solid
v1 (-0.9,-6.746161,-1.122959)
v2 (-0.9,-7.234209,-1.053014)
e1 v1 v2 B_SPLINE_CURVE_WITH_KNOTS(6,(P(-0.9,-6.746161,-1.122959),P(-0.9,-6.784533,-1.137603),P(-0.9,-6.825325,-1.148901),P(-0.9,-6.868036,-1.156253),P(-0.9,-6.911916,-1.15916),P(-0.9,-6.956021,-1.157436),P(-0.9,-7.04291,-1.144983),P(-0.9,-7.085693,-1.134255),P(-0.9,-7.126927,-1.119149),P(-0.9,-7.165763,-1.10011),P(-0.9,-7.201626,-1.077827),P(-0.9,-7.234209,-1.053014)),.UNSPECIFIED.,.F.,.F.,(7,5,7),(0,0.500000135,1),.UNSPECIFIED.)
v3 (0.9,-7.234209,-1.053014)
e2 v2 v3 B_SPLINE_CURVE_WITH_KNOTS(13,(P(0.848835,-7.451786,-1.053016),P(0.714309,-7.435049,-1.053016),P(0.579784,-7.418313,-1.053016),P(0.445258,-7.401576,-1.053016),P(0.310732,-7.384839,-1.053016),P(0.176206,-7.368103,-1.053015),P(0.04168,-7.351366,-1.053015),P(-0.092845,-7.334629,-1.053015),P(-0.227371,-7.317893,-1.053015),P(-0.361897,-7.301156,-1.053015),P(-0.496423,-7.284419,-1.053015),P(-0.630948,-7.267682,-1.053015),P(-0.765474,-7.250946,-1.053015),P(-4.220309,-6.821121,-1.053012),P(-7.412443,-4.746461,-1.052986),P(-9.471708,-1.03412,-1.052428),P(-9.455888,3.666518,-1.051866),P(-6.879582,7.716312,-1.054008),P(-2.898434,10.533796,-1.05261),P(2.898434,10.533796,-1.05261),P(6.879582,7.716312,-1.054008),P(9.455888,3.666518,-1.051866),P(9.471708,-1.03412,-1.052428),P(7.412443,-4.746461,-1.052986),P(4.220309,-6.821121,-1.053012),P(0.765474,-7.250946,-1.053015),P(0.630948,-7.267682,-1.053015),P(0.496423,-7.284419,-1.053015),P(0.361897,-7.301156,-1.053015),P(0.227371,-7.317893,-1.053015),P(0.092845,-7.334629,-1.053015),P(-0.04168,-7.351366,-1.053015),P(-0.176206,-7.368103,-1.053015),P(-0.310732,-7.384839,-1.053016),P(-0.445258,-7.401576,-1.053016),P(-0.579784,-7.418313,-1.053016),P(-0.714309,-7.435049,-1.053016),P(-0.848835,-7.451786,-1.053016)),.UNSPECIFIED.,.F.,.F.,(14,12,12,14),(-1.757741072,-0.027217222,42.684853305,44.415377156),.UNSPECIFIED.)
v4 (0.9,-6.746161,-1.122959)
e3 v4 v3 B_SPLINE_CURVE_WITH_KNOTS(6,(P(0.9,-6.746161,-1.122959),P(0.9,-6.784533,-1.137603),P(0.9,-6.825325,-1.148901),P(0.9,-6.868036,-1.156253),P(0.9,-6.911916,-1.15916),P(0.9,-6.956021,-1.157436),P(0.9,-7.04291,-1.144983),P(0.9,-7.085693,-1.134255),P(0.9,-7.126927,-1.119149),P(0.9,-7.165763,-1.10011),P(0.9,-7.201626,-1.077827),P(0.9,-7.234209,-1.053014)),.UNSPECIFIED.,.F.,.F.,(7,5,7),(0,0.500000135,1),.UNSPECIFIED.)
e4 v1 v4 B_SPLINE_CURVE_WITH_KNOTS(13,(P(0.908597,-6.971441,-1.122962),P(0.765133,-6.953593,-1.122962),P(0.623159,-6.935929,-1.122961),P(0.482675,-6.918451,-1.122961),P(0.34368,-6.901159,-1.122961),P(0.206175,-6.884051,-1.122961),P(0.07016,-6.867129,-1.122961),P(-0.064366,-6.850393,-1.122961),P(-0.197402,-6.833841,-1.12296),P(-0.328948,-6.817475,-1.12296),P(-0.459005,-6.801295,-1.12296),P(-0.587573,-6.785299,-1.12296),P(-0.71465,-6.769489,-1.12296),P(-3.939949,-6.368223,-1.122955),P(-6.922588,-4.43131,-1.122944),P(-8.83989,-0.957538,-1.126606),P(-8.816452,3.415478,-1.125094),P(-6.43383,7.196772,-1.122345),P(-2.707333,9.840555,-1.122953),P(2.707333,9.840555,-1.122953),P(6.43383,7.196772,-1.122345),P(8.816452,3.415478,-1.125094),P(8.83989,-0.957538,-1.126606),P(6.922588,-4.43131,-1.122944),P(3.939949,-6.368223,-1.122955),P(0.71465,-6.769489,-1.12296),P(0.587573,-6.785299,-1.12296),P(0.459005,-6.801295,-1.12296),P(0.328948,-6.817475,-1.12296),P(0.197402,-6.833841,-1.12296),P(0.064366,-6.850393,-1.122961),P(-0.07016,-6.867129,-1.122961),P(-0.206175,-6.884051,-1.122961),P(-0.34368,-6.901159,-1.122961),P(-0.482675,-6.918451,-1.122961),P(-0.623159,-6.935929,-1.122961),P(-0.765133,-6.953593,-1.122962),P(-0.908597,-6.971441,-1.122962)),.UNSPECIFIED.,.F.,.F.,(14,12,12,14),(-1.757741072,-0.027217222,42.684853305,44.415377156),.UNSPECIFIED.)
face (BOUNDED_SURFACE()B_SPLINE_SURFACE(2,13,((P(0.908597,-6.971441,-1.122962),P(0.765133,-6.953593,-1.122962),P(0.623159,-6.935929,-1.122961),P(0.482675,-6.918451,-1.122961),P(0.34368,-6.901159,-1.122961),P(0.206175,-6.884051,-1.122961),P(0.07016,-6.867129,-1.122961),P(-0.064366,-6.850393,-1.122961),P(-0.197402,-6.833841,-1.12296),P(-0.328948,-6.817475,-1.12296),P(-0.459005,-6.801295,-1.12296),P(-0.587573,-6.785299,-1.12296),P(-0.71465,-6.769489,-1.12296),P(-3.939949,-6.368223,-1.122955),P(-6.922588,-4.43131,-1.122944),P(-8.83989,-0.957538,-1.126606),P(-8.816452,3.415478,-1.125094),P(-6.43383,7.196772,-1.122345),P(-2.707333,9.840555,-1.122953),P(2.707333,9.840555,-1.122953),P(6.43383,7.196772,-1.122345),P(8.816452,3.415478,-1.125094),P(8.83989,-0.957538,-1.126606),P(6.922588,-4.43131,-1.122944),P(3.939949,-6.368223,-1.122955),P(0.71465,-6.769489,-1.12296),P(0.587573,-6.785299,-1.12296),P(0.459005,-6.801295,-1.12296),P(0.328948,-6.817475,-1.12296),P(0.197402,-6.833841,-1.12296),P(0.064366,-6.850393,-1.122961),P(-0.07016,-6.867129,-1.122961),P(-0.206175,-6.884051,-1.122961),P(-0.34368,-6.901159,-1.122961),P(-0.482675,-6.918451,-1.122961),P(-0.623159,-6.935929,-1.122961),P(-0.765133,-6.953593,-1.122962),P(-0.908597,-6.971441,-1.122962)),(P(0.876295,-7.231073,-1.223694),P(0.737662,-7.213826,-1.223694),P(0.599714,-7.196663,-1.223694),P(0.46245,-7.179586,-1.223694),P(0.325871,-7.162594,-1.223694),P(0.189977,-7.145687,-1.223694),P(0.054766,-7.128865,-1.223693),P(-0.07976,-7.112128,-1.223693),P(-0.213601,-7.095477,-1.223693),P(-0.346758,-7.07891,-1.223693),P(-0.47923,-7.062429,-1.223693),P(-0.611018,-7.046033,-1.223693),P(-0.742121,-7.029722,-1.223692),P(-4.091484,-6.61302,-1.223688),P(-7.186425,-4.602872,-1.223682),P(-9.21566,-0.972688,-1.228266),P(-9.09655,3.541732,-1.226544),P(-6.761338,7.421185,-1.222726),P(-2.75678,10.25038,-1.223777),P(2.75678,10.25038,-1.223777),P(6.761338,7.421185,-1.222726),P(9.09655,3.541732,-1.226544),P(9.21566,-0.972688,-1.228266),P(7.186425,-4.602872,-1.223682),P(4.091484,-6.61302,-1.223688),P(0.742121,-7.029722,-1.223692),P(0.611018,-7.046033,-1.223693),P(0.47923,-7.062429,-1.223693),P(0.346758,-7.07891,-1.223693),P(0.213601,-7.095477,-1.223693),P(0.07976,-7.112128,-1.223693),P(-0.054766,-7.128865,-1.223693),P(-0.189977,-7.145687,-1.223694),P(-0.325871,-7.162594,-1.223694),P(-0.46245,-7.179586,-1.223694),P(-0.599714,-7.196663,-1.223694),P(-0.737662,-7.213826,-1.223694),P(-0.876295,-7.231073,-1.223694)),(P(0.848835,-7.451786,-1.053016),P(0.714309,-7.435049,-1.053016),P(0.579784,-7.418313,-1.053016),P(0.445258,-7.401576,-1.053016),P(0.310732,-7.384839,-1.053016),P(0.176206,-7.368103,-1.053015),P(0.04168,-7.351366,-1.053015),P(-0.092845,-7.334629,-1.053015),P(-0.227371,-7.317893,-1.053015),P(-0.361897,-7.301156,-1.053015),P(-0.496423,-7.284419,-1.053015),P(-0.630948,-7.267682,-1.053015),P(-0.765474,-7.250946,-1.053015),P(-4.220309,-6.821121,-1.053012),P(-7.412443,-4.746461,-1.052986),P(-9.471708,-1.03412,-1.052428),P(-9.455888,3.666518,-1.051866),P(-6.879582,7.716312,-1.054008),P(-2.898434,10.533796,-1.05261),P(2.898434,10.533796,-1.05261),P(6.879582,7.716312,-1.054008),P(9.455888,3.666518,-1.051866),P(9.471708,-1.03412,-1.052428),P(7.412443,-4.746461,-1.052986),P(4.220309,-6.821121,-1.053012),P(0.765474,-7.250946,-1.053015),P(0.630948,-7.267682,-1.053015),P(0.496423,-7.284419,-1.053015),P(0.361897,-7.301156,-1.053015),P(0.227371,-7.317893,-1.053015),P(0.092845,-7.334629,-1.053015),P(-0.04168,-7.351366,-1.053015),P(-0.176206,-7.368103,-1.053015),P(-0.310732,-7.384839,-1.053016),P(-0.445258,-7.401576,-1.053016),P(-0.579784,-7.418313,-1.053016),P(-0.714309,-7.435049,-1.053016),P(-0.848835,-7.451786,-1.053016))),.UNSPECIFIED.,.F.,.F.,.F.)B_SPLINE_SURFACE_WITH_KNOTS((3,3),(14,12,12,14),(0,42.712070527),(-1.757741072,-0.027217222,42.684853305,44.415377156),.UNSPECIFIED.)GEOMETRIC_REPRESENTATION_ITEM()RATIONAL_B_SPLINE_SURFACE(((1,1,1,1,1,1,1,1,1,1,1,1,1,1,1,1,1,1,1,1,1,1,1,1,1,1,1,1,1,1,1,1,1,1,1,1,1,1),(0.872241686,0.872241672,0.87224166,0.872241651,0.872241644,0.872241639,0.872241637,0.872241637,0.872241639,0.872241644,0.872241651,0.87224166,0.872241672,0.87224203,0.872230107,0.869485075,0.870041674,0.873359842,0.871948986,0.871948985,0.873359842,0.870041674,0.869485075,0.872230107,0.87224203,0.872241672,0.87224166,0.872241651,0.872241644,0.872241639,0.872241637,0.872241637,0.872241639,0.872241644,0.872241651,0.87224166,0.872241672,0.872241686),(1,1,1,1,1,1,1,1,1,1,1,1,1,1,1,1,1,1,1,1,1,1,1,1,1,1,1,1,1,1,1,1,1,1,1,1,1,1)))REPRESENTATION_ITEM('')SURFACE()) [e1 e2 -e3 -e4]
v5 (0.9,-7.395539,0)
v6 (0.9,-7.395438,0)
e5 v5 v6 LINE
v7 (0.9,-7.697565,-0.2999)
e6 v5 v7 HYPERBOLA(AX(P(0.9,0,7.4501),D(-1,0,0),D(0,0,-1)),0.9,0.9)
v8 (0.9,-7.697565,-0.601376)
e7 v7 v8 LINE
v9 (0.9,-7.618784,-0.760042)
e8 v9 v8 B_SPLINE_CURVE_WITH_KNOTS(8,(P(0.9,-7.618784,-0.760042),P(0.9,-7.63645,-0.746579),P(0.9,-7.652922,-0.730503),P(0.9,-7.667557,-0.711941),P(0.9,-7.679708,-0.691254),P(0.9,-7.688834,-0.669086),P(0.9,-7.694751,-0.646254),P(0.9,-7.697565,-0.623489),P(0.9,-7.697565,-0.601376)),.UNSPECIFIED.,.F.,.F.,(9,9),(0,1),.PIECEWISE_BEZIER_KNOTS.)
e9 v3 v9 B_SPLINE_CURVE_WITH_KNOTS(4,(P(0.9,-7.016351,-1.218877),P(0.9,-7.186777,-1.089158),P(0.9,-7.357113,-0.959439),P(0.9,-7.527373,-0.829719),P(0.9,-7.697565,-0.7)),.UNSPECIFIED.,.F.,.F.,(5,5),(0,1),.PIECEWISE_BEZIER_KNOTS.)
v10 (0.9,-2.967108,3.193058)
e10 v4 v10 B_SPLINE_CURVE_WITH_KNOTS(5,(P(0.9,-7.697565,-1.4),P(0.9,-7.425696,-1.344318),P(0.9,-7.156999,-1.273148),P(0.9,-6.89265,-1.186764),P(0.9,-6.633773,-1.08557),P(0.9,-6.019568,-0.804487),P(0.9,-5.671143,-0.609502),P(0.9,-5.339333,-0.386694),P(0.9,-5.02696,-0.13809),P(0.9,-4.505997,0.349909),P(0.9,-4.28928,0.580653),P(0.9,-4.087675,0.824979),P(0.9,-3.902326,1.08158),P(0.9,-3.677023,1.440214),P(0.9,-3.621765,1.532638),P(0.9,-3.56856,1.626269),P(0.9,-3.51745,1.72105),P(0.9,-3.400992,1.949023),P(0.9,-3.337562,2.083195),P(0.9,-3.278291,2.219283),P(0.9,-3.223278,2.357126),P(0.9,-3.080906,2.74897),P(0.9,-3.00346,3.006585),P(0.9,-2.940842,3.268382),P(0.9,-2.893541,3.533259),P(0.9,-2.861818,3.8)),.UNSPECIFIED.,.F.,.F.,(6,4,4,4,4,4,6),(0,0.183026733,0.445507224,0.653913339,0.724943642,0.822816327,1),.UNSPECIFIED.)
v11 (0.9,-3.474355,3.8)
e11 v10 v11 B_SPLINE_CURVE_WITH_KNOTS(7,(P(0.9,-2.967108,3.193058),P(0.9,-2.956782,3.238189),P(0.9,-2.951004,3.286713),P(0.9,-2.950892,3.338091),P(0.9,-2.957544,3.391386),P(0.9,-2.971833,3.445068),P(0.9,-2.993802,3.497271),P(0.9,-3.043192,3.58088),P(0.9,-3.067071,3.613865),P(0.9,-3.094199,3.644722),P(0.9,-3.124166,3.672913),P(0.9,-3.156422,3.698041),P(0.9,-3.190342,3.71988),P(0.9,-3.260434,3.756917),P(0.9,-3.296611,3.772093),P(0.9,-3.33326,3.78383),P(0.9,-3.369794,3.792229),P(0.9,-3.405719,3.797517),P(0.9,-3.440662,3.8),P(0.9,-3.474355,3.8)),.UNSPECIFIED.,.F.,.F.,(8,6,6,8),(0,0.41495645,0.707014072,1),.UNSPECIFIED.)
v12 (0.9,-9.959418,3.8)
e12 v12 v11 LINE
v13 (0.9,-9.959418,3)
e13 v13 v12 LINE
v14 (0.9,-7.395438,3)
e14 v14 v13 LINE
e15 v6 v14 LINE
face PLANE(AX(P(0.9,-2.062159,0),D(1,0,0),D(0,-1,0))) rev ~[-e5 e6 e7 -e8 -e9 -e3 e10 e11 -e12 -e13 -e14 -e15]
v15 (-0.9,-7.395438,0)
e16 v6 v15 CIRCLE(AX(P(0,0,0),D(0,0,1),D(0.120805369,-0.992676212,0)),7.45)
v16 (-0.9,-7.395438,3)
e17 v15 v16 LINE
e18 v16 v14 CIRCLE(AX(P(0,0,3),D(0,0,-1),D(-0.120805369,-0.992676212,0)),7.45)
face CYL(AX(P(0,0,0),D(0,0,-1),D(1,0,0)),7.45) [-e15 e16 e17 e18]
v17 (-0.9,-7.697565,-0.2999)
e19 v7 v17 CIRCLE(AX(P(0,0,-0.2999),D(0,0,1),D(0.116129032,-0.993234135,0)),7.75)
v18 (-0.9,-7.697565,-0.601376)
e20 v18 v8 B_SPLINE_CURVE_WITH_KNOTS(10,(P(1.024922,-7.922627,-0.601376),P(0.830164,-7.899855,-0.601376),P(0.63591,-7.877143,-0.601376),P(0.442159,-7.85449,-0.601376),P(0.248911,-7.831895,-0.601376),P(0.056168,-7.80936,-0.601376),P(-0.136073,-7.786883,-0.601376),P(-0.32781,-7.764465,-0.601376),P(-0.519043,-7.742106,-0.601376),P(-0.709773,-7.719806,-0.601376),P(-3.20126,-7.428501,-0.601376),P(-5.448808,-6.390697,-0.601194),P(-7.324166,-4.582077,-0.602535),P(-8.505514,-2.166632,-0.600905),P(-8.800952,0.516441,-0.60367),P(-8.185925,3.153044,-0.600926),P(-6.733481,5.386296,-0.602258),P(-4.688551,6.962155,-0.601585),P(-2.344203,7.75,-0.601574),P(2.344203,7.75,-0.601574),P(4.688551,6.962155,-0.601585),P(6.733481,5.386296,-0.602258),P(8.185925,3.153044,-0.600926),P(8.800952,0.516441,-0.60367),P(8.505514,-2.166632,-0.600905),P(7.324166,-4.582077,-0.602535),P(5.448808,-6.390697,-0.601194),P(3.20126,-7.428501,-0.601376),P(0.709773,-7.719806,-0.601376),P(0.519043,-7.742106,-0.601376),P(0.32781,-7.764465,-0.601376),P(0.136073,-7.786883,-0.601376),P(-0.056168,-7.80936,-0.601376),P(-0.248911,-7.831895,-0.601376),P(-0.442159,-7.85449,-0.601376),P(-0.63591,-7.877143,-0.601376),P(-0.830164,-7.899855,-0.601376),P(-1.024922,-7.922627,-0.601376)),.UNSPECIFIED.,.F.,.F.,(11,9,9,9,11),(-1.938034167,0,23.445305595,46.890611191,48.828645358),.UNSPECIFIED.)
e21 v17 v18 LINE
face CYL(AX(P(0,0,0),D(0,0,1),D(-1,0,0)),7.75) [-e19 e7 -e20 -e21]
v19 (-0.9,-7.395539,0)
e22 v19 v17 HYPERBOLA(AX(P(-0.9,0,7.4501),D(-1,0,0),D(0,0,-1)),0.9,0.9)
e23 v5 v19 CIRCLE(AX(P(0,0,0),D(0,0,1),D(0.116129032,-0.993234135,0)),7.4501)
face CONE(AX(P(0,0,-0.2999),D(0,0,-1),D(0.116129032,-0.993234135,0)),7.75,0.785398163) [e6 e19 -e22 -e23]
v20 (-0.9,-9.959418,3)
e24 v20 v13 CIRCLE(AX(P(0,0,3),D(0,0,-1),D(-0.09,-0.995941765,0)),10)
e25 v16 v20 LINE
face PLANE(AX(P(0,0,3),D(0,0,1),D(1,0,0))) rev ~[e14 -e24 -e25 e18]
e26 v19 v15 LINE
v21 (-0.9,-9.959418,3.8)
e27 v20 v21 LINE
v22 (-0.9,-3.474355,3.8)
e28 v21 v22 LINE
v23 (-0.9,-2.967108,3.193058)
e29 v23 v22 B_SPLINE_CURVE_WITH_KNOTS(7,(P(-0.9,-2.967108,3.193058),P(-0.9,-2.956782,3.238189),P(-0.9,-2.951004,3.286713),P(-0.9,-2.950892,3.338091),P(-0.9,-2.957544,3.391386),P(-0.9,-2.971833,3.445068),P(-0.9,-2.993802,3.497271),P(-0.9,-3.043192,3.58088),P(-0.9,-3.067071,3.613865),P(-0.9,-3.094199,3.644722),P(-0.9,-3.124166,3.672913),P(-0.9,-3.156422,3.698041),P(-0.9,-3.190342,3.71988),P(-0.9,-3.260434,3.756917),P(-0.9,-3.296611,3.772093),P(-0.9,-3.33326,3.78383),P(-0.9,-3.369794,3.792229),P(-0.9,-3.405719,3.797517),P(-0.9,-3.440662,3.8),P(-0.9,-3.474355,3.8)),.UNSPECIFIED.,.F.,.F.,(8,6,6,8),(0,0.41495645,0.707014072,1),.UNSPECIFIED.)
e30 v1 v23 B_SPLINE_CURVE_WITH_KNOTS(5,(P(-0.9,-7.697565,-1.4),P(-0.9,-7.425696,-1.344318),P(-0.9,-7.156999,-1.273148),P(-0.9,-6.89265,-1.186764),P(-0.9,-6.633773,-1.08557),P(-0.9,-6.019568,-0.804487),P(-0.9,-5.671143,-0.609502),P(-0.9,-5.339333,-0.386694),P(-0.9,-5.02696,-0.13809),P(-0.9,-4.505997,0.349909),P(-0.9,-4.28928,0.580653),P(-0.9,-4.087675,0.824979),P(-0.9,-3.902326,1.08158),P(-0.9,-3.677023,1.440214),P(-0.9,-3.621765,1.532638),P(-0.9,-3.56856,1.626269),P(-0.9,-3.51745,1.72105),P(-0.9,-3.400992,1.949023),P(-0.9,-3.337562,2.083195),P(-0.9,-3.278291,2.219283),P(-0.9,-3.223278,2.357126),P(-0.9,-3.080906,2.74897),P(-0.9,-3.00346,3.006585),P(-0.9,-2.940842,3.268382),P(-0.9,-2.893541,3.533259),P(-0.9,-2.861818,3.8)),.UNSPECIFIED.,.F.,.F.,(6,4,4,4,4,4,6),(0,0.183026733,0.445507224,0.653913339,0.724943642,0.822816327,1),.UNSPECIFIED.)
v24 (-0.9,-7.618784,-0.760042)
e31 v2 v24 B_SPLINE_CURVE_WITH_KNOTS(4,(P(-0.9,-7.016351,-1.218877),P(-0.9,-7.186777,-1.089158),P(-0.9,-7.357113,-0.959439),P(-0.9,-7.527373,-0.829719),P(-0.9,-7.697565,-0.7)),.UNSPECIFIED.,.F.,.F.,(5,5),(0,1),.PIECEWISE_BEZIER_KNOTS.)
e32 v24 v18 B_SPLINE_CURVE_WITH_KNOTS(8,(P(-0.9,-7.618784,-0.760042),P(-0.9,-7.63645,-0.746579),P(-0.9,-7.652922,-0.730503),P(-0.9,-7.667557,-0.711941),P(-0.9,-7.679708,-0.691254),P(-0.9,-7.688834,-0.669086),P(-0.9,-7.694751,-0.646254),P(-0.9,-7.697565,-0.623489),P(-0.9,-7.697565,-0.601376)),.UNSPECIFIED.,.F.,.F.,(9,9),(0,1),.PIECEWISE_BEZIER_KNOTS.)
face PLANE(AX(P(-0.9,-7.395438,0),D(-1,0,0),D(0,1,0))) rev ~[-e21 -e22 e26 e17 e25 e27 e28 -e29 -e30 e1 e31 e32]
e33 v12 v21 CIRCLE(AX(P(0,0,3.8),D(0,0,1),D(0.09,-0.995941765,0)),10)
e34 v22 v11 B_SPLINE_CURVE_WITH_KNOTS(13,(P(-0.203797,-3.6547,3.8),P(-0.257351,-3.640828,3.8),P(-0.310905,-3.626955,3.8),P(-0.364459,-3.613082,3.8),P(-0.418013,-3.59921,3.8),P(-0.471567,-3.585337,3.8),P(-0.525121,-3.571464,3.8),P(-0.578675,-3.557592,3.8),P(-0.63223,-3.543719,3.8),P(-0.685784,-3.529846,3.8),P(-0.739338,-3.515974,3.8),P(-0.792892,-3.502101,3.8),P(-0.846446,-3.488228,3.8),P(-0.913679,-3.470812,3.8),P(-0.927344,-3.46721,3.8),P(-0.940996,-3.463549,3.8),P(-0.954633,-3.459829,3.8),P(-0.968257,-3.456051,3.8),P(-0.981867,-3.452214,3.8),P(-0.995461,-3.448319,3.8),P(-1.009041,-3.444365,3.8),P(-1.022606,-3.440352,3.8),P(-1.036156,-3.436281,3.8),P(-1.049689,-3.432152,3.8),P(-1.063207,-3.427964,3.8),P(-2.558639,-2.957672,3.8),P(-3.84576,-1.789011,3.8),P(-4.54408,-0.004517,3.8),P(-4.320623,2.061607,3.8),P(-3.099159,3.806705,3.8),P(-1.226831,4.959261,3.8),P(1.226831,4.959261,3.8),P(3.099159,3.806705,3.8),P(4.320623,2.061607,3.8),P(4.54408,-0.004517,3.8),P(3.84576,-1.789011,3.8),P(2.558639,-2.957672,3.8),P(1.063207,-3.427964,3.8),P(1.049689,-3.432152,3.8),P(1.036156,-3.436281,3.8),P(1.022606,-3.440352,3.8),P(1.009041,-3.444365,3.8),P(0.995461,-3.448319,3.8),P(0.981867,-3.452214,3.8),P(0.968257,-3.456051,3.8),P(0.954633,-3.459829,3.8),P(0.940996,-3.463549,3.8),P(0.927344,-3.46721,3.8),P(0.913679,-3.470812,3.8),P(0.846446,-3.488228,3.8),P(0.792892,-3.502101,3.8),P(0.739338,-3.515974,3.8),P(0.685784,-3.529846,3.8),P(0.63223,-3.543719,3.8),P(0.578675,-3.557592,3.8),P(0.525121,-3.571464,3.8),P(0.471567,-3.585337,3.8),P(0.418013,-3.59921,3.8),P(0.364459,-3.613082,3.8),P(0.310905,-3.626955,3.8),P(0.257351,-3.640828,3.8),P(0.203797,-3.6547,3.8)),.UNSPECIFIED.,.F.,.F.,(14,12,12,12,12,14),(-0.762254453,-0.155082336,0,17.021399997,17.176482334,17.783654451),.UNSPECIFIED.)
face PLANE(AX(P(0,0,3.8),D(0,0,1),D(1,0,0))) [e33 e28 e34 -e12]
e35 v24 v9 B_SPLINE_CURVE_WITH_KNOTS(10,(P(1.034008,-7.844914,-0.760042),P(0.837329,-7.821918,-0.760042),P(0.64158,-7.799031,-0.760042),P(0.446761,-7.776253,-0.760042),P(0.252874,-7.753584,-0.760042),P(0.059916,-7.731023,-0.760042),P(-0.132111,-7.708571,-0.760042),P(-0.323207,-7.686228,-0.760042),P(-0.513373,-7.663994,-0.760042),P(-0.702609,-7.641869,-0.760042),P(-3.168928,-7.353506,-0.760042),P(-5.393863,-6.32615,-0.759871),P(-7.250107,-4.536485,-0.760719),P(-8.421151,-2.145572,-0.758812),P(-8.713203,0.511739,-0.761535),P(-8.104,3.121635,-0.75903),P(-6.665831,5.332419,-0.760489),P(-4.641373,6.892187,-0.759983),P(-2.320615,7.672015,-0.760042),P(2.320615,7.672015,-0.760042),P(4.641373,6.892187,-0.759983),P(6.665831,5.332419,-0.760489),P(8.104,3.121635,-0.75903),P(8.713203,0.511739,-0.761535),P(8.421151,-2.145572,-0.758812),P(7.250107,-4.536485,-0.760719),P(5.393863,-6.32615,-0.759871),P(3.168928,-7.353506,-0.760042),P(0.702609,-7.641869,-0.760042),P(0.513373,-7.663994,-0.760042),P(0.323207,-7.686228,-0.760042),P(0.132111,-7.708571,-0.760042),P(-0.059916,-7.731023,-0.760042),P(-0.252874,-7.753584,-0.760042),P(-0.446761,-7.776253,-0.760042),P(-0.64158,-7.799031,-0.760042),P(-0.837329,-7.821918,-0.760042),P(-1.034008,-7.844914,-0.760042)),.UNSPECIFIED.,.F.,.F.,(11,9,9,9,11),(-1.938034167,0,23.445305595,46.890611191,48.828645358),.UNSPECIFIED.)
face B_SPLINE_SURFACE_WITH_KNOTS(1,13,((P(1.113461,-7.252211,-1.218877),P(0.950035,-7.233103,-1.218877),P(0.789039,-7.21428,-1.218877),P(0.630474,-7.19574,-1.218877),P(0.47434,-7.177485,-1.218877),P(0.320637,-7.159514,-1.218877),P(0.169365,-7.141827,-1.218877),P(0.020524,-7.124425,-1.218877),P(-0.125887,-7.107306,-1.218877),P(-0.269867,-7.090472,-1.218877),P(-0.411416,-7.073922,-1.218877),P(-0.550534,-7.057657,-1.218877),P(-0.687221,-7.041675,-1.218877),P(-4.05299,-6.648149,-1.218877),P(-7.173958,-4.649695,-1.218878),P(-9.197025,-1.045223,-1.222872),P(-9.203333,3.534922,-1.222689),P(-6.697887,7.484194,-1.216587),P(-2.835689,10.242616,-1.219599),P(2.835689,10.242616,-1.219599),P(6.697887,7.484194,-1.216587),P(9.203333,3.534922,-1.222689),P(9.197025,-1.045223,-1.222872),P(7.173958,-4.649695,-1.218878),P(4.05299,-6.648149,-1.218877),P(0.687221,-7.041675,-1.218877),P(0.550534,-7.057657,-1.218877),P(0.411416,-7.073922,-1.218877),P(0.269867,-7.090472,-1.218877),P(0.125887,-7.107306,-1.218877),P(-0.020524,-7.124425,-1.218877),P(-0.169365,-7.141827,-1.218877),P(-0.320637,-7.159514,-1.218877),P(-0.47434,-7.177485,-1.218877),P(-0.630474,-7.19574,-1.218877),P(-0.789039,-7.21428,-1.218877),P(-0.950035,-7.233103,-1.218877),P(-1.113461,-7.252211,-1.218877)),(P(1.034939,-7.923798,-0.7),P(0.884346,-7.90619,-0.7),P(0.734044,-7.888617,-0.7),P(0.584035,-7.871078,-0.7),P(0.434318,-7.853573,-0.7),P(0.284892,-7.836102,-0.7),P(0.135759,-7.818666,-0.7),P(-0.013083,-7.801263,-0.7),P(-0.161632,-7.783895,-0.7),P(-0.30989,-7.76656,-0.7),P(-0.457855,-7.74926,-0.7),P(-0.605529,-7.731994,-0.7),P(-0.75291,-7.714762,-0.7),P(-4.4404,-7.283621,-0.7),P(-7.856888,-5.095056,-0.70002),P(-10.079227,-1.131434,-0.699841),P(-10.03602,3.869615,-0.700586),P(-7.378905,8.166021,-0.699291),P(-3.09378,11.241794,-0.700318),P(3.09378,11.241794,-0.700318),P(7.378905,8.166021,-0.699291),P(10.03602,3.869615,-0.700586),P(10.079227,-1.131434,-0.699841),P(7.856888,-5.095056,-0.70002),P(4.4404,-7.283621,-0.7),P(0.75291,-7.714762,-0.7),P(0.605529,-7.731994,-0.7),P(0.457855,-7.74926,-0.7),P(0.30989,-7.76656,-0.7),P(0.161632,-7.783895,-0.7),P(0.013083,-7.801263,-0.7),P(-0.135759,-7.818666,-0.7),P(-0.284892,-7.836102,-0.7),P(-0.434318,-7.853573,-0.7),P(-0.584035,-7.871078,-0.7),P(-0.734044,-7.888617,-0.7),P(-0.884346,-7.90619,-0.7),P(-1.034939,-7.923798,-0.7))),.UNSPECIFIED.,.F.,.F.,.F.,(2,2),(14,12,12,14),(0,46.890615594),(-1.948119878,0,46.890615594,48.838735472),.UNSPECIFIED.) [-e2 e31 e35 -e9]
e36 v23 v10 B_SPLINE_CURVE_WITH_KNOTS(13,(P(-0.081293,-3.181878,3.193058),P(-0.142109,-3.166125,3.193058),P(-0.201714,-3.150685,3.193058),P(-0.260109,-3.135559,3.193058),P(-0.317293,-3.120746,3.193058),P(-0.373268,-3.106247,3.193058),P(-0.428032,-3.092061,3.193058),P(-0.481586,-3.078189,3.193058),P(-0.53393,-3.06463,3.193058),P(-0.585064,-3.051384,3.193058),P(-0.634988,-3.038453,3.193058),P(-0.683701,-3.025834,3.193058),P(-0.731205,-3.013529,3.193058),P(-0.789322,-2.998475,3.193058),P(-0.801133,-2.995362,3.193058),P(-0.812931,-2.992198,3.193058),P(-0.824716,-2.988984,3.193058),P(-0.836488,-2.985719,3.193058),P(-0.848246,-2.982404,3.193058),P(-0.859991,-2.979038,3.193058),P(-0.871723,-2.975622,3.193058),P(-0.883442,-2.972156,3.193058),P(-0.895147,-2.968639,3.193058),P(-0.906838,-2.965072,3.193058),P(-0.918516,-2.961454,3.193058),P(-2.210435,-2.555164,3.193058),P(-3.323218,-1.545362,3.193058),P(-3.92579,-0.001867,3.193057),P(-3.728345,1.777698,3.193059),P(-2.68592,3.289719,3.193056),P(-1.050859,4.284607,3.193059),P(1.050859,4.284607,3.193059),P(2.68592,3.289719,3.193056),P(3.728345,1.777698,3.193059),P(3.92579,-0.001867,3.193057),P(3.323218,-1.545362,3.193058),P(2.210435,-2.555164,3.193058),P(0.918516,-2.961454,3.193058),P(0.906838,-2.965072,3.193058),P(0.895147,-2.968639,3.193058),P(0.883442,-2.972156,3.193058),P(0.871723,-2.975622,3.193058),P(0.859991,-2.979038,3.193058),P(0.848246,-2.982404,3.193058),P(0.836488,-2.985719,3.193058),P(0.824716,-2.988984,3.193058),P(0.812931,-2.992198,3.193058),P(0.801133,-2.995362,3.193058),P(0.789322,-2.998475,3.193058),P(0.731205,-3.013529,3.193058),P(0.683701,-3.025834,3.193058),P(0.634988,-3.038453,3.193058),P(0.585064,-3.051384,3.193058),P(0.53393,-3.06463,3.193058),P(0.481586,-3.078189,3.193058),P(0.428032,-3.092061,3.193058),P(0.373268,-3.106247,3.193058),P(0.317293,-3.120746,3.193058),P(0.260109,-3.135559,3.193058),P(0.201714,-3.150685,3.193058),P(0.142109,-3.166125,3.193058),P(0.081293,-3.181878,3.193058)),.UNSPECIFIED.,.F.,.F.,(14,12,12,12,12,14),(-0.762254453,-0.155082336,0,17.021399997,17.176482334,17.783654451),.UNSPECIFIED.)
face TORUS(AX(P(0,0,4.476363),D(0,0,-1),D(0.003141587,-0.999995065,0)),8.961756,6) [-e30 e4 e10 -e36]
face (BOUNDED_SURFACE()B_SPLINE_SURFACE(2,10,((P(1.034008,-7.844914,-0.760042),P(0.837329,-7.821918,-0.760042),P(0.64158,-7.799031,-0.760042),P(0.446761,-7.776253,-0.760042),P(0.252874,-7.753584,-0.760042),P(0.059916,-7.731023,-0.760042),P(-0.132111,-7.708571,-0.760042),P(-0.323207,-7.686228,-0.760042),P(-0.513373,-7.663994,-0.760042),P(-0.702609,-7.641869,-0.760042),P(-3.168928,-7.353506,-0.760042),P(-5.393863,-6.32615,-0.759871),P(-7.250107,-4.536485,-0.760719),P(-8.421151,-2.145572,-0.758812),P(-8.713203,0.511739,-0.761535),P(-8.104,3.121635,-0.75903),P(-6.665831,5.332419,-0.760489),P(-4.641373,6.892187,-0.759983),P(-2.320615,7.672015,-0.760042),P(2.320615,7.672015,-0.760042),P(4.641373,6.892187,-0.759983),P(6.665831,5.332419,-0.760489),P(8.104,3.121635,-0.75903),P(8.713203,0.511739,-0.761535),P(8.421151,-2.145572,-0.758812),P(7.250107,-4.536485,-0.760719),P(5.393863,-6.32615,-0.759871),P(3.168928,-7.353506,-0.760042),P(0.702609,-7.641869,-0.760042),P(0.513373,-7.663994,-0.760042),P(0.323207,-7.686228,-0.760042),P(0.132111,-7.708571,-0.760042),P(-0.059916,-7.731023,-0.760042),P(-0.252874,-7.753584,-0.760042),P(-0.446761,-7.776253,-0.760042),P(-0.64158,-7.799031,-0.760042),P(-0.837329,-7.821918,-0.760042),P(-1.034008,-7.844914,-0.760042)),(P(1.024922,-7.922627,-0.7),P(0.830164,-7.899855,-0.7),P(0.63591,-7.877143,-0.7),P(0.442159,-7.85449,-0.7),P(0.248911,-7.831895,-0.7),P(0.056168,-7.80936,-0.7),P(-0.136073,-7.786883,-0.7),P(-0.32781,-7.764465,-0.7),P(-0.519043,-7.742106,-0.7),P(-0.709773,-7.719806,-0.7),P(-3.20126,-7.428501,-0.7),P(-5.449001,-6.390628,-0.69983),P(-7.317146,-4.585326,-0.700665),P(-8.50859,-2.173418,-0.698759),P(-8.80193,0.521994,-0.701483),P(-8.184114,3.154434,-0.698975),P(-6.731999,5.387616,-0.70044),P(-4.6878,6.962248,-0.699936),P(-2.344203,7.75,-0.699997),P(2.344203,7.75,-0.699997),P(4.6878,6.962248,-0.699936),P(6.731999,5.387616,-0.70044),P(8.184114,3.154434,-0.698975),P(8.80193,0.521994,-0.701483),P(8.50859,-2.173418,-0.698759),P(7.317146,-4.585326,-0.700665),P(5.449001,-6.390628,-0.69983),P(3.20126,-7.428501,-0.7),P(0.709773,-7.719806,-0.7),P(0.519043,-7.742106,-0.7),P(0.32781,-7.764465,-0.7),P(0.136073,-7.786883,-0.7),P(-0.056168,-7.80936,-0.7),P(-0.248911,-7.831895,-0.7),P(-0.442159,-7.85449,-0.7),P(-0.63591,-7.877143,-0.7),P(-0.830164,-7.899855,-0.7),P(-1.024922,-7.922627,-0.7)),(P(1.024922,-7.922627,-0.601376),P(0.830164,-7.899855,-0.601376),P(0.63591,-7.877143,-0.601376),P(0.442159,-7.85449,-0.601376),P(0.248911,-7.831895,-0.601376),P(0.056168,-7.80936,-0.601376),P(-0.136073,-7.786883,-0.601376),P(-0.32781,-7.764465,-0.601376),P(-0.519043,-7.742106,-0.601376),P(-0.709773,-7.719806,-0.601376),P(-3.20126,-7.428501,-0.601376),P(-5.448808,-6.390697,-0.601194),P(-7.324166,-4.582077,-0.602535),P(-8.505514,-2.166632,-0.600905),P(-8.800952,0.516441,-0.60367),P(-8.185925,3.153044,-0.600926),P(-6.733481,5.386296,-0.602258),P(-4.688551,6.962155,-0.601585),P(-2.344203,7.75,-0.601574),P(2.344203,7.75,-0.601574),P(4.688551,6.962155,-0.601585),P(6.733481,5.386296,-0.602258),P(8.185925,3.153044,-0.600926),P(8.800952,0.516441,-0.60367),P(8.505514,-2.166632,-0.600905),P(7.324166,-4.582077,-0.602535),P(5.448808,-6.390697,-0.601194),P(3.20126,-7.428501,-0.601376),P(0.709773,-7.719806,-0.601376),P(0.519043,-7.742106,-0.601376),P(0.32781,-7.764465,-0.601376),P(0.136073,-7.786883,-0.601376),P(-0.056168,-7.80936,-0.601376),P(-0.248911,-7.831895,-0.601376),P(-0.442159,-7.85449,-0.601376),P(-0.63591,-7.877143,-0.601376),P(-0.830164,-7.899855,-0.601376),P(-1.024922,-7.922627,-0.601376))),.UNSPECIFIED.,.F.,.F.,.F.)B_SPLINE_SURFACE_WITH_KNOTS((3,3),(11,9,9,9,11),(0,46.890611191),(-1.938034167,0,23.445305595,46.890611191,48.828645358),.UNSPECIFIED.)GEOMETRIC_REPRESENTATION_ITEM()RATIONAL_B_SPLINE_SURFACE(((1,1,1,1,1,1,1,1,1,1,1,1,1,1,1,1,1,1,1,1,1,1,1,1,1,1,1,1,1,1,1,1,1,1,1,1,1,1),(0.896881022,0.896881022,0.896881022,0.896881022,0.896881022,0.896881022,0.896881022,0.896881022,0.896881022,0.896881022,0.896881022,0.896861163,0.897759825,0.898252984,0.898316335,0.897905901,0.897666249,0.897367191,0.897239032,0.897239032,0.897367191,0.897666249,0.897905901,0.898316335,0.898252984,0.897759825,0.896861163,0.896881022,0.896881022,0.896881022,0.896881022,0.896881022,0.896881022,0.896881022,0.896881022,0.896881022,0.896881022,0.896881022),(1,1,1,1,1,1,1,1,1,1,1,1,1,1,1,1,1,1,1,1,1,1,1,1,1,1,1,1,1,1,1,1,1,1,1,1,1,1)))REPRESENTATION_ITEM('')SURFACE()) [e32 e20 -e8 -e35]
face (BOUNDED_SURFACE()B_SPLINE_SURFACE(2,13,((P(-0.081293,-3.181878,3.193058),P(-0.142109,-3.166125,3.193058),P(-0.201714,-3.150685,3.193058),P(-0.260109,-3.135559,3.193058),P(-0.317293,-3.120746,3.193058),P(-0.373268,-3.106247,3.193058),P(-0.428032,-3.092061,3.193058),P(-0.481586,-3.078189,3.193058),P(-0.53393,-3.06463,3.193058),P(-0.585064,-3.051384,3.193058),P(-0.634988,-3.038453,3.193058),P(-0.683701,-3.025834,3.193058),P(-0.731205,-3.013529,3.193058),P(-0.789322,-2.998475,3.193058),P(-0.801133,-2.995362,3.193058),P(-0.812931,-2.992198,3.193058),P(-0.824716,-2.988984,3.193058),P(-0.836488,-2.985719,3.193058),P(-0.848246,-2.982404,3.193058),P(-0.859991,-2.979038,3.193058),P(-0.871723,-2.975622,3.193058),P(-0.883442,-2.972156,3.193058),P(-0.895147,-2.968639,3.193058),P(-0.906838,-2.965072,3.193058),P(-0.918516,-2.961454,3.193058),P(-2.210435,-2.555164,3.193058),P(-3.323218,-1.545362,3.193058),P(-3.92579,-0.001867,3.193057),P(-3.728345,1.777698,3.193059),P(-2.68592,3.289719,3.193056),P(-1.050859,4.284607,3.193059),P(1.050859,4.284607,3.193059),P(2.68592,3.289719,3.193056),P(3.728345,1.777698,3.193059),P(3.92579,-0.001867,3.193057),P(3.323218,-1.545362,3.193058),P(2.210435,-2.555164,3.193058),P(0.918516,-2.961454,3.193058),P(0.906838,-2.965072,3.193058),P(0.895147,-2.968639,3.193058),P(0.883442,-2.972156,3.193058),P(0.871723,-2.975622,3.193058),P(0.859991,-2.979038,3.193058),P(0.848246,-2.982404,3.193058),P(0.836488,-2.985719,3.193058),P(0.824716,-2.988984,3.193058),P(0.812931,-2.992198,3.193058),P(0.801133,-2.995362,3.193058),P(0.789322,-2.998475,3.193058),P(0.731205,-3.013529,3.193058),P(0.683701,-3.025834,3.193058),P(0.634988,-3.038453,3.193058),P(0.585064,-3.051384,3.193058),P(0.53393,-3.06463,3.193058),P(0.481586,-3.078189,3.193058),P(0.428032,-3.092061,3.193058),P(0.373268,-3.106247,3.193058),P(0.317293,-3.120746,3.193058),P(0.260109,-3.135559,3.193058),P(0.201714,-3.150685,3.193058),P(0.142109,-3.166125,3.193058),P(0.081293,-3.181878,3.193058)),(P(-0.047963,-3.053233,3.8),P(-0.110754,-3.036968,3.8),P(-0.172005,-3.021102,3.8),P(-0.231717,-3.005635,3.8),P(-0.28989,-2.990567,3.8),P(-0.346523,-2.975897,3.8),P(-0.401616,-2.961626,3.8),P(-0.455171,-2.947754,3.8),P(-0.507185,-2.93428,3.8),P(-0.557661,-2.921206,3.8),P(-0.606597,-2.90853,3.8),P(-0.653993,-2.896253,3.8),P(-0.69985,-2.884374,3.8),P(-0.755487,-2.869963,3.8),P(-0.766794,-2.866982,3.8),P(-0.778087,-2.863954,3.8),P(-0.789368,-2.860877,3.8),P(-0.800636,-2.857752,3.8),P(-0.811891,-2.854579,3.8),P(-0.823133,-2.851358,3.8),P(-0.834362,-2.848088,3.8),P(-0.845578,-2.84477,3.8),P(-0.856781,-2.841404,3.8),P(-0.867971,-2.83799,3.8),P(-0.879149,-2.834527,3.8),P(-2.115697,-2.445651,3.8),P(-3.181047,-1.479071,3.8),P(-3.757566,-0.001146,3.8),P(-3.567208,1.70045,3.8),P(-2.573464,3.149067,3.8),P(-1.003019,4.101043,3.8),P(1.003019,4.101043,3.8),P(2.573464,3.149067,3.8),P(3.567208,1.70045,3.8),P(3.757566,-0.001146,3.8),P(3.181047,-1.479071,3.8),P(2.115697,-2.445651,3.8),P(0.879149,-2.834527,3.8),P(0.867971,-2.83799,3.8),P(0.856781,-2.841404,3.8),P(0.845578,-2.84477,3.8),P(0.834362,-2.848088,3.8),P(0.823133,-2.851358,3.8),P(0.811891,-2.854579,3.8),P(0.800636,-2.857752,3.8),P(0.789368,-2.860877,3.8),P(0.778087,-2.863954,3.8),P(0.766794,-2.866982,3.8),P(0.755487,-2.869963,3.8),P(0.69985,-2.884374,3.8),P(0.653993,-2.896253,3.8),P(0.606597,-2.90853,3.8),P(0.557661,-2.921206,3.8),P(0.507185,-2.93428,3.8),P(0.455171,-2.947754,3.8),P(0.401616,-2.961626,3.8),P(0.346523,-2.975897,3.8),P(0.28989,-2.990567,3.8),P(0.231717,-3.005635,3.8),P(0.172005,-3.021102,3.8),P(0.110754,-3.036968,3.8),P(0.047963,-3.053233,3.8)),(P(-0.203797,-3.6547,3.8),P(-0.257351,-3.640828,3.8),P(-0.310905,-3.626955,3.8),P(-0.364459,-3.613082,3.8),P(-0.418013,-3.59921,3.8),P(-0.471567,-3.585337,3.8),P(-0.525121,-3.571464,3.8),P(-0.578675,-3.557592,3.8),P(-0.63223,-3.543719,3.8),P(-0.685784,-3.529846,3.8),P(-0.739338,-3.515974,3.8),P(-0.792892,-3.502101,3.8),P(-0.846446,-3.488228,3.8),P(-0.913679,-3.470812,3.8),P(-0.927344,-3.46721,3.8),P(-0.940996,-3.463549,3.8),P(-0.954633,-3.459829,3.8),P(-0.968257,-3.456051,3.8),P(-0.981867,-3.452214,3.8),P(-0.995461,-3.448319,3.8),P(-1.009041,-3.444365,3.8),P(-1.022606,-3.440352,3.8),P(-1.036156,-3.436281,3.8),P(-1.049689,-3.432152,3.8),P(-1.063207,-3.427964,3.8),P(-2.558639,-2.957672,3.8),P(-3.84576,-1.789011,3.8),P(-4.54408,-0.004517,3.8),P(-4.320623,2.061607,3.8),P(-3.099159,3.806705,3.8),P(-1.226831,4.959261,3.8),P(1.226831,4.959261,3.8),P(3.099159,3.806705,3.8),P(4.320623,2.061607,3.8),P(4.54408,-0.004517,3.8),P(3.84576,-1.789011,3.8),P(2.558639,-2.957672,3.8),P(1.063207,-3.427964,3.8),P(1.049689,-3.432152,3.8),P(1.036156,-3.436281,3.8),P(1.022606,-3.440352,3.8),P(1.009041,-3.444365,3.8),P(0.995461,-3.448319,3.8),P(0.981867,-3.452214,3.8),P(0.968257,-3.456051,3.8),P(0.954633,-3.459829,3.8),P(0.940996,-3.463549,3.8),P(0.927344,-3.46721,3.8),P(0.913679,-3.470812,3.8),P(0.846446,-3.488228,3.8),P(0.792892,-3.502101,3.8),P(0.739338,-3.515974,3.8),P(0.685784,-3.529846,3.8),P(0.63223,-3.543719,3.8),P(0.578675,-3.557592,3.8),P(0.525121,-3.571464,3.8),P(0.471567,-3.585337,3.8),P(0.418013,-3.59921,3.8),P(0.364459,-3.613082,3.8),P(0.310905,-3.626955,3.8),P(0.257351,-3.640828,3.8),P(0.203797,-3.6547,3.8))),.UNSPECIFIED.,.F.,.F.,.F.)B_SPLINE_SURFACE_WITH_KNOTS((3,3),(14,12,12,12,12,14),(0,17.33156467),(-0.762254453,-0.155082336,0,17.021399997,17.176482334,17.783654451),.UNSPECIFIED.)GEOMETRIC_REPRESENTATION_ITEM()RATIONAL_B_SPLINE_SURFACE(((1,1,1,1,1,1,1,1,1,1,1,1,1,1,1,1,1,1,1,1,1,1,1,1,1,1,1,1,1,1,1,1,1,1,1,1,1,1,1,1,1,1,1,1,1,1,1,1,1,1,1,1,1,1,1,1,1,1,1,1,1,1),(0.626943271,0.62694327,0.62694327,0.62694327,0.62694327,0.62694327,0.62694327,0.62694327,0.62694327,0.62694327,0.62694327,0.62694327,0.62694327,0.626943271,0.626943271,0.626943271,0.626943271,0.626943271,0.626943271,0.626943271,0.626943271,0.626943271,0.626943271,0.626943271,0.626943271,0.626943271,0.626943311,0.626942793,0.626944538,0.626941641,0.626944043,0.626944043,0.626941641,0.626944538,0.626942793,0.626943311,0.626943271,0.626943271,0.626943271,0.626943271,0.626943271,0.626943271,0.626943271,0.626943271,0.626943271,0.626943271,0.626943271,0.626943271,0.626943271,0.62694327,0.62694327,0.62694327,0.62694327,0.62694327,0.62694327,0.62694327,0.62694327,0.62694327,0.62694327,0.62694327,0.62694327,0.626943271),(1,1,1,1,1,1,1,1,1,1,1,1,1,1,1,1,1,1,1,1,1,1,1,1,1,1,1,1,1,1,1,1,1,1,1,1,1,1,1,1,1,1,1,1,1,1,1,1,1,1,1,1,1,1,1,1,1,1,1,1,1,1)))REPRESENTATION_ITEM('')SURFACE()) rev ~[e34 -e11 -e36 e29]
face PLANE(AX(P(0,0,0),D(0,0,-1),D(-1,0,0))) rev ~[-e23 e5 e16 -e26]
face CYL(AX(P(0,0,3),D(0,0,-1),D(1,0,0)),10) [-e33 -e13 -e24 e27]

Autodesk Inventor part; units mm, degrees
ref_plane "YZ Plane" through (0, 0, 0) normal (1, 0, 0) x (0, 1, 0)
ref_plane "XZ Plane" through (0, 0, 0) normal (0, 1, 0) x (-1, 0, 0)
ref_plane "XY Plane" through (0, 0, 0) normal (0, 0, 1) x (1, 0, 0)
sketch "Skizze1" plane through (0, 0, 0) normal (0, 0, 1) x (1, 0, 0)
  circle A0 centre (0, 0) radius 7.45
  line L0 (-0.9, 9) -> (0.9, 9)
  line L1 (0.9, 9) -> (0.9, -9)
  line L2 (0.9, -9) -> (-0.9, -9)
  line L3 (-0.9, -9) -> (-0.9, 9)
  line L4 (-0.9, 9) -> (0.9, -9) construction
  line L5 (0.9, 9) -> (-0.9, -9) construction
  circle A1 centre (0, 0) radius 2.25
  point P0 (-0.9, -2.0622)
  point P1 (0.9, -2.0622)
  point P2 (0.9, -7.3954)
  point P3 (-0.9, -7.3954)
  dimension "d0" = 14.9
  dimension "d1" = 1.8
  dimension "d2" = 4.5
extrude "Extrusion1" add sketch "Skizze1" along normal blind 3 contours A0 L1 A1 | L1 A1 L3 A0 | L3 A1 A0 picked at (0.4002, 5.6965)
sketch "Skizze2" plane through (0, 0, 3) normal (0, 0, 1) x (1, 0, 0)
  line L0 (0.9, -2.0622) -> (0.9, -7.3954) projected
  arc A0 (0.9, -7.3954) -> (-0.9, -7.3954) centre (0, 0) ccw projected
  line L1 (-0.9, -7.3954) -> (-0.9, -2.0622) projected
  arc A1 (0.9, -2.0622) -> (-0.9, -2.0622) centre (0, 0) ccw projected
  circle A2 centre (0, 0) radius 10
  line L2 (-0.9, 11.3464) -> (0.9, 11.3464)
  line L3 (0.9, 11.3464) -> (0.9, -11.3464)
  line L4 (0.9, -11.3464) -> (-0.9, -11.3464)
  line L5 (-0.9, -11.3464) -> (-0.9, 11.3464)
  line L6 (-0.9, 11.3464) -> (0.9, -11.3464) construction
  line L7 (0.9, 11.3464) -> (-0.9, -11.3464) construction
  point P0 (-0.9, -9.9594)
  point P1 (-0.9, 2.0622)
  point P2 (-0.9, 7.3954)
  point P3 (0.9, 7.3954)
  point P4 (0.9, 2.0622)
  point P5 (0.9, -9.9594)
  dimension "d5" = 20
  dimension "d6" = 1.8
extrude "Extrusion2" add sketch "Skizze2" along normal blind 0.8 contours A1 L3 A0 L0 | A0 L3 A2 | A1 L5 A0 L3 | A0 L5 A2 L3 | A1 L1 A0 L5 | A0 L5 A2
sketch "Skizze3" plane through (0, 0, 0) normal (0, 0, -1) x (-1, 0, 0)
  line L0 (-0.9, -2.0622) -> (-0.9, -7.3954) projected
  arc A0 (0.9, -2.0622) -> (-0.9, -2.0622) centre (0, 0) ccw projected
  line L1 (0.9, -7.3954) -> (0.9, -2.0622) projected
  arc A1 (0.9, -7.3954) -> (-0.9, -7.3954) centre (0, 0) ccw projected
  circle A2 centre (0, 0) radius 7.75
  line L2 (0.9, 14.7103) -> (-0.9, 14.7103)
  line L3 (-0.9, 14.7103) -> (-0.9, -14.7103)
  line L4 (-0.9, -14.7103) -> (0.9, -14.7103)
  line L5 (0.9, -14.7103) -> (0.9, 14.7103)
  line L6 (0.9, 14.7103) -> (-0.9, -14.7103) construction
  line L7 (-0.9, 14.7103) -> (0.9, -14.7103) construction
  point P0 (-0.9, -7.6976)
  point P1 (0.9, -7.6976)
  dimension "d9" = 15.5
  dimension "d10" = 1.8
extrude "Extrusion3" add sketch "Skizze3" along normal blind 1.4 contours L0 A1 L3 A0 | L3 A2 A1 | L3 A1 L5 A0 | L3 A2 L5 A1 | L5 A1 L1 A0 | L5 A2 A1
sketch "Skizze4" plane through (0, 0, 3.8) normal (0, 0, 1) x (1, 0, 0)
  circle A0 centre (0, 0) radius 3
extrude "Extrusion4" cut sketch "Skizze4" against normal through all
chamfer "Fase2" distance 0.3 angle 45 1 edges at (0, 7.75, 0)
fillet "Rundung5" radius 6 1 edges at (0, 3, -1.4)
chamfer "Fase3" distance 0.7 angle 45 1 edges at (0, 7.75, -1.4)
fillet "Rundung6" radius 0.5 1 edges at (0, 7.0754, -1.2194)
fillet "Rundung7" radius 0.2 1 edges at (0, 7.75, -0.7)
fillet "Rundung8" radius 0.5 1 edges at (0, 3, 3.8)
properties part number "Buttomplate_BedholePlug"
